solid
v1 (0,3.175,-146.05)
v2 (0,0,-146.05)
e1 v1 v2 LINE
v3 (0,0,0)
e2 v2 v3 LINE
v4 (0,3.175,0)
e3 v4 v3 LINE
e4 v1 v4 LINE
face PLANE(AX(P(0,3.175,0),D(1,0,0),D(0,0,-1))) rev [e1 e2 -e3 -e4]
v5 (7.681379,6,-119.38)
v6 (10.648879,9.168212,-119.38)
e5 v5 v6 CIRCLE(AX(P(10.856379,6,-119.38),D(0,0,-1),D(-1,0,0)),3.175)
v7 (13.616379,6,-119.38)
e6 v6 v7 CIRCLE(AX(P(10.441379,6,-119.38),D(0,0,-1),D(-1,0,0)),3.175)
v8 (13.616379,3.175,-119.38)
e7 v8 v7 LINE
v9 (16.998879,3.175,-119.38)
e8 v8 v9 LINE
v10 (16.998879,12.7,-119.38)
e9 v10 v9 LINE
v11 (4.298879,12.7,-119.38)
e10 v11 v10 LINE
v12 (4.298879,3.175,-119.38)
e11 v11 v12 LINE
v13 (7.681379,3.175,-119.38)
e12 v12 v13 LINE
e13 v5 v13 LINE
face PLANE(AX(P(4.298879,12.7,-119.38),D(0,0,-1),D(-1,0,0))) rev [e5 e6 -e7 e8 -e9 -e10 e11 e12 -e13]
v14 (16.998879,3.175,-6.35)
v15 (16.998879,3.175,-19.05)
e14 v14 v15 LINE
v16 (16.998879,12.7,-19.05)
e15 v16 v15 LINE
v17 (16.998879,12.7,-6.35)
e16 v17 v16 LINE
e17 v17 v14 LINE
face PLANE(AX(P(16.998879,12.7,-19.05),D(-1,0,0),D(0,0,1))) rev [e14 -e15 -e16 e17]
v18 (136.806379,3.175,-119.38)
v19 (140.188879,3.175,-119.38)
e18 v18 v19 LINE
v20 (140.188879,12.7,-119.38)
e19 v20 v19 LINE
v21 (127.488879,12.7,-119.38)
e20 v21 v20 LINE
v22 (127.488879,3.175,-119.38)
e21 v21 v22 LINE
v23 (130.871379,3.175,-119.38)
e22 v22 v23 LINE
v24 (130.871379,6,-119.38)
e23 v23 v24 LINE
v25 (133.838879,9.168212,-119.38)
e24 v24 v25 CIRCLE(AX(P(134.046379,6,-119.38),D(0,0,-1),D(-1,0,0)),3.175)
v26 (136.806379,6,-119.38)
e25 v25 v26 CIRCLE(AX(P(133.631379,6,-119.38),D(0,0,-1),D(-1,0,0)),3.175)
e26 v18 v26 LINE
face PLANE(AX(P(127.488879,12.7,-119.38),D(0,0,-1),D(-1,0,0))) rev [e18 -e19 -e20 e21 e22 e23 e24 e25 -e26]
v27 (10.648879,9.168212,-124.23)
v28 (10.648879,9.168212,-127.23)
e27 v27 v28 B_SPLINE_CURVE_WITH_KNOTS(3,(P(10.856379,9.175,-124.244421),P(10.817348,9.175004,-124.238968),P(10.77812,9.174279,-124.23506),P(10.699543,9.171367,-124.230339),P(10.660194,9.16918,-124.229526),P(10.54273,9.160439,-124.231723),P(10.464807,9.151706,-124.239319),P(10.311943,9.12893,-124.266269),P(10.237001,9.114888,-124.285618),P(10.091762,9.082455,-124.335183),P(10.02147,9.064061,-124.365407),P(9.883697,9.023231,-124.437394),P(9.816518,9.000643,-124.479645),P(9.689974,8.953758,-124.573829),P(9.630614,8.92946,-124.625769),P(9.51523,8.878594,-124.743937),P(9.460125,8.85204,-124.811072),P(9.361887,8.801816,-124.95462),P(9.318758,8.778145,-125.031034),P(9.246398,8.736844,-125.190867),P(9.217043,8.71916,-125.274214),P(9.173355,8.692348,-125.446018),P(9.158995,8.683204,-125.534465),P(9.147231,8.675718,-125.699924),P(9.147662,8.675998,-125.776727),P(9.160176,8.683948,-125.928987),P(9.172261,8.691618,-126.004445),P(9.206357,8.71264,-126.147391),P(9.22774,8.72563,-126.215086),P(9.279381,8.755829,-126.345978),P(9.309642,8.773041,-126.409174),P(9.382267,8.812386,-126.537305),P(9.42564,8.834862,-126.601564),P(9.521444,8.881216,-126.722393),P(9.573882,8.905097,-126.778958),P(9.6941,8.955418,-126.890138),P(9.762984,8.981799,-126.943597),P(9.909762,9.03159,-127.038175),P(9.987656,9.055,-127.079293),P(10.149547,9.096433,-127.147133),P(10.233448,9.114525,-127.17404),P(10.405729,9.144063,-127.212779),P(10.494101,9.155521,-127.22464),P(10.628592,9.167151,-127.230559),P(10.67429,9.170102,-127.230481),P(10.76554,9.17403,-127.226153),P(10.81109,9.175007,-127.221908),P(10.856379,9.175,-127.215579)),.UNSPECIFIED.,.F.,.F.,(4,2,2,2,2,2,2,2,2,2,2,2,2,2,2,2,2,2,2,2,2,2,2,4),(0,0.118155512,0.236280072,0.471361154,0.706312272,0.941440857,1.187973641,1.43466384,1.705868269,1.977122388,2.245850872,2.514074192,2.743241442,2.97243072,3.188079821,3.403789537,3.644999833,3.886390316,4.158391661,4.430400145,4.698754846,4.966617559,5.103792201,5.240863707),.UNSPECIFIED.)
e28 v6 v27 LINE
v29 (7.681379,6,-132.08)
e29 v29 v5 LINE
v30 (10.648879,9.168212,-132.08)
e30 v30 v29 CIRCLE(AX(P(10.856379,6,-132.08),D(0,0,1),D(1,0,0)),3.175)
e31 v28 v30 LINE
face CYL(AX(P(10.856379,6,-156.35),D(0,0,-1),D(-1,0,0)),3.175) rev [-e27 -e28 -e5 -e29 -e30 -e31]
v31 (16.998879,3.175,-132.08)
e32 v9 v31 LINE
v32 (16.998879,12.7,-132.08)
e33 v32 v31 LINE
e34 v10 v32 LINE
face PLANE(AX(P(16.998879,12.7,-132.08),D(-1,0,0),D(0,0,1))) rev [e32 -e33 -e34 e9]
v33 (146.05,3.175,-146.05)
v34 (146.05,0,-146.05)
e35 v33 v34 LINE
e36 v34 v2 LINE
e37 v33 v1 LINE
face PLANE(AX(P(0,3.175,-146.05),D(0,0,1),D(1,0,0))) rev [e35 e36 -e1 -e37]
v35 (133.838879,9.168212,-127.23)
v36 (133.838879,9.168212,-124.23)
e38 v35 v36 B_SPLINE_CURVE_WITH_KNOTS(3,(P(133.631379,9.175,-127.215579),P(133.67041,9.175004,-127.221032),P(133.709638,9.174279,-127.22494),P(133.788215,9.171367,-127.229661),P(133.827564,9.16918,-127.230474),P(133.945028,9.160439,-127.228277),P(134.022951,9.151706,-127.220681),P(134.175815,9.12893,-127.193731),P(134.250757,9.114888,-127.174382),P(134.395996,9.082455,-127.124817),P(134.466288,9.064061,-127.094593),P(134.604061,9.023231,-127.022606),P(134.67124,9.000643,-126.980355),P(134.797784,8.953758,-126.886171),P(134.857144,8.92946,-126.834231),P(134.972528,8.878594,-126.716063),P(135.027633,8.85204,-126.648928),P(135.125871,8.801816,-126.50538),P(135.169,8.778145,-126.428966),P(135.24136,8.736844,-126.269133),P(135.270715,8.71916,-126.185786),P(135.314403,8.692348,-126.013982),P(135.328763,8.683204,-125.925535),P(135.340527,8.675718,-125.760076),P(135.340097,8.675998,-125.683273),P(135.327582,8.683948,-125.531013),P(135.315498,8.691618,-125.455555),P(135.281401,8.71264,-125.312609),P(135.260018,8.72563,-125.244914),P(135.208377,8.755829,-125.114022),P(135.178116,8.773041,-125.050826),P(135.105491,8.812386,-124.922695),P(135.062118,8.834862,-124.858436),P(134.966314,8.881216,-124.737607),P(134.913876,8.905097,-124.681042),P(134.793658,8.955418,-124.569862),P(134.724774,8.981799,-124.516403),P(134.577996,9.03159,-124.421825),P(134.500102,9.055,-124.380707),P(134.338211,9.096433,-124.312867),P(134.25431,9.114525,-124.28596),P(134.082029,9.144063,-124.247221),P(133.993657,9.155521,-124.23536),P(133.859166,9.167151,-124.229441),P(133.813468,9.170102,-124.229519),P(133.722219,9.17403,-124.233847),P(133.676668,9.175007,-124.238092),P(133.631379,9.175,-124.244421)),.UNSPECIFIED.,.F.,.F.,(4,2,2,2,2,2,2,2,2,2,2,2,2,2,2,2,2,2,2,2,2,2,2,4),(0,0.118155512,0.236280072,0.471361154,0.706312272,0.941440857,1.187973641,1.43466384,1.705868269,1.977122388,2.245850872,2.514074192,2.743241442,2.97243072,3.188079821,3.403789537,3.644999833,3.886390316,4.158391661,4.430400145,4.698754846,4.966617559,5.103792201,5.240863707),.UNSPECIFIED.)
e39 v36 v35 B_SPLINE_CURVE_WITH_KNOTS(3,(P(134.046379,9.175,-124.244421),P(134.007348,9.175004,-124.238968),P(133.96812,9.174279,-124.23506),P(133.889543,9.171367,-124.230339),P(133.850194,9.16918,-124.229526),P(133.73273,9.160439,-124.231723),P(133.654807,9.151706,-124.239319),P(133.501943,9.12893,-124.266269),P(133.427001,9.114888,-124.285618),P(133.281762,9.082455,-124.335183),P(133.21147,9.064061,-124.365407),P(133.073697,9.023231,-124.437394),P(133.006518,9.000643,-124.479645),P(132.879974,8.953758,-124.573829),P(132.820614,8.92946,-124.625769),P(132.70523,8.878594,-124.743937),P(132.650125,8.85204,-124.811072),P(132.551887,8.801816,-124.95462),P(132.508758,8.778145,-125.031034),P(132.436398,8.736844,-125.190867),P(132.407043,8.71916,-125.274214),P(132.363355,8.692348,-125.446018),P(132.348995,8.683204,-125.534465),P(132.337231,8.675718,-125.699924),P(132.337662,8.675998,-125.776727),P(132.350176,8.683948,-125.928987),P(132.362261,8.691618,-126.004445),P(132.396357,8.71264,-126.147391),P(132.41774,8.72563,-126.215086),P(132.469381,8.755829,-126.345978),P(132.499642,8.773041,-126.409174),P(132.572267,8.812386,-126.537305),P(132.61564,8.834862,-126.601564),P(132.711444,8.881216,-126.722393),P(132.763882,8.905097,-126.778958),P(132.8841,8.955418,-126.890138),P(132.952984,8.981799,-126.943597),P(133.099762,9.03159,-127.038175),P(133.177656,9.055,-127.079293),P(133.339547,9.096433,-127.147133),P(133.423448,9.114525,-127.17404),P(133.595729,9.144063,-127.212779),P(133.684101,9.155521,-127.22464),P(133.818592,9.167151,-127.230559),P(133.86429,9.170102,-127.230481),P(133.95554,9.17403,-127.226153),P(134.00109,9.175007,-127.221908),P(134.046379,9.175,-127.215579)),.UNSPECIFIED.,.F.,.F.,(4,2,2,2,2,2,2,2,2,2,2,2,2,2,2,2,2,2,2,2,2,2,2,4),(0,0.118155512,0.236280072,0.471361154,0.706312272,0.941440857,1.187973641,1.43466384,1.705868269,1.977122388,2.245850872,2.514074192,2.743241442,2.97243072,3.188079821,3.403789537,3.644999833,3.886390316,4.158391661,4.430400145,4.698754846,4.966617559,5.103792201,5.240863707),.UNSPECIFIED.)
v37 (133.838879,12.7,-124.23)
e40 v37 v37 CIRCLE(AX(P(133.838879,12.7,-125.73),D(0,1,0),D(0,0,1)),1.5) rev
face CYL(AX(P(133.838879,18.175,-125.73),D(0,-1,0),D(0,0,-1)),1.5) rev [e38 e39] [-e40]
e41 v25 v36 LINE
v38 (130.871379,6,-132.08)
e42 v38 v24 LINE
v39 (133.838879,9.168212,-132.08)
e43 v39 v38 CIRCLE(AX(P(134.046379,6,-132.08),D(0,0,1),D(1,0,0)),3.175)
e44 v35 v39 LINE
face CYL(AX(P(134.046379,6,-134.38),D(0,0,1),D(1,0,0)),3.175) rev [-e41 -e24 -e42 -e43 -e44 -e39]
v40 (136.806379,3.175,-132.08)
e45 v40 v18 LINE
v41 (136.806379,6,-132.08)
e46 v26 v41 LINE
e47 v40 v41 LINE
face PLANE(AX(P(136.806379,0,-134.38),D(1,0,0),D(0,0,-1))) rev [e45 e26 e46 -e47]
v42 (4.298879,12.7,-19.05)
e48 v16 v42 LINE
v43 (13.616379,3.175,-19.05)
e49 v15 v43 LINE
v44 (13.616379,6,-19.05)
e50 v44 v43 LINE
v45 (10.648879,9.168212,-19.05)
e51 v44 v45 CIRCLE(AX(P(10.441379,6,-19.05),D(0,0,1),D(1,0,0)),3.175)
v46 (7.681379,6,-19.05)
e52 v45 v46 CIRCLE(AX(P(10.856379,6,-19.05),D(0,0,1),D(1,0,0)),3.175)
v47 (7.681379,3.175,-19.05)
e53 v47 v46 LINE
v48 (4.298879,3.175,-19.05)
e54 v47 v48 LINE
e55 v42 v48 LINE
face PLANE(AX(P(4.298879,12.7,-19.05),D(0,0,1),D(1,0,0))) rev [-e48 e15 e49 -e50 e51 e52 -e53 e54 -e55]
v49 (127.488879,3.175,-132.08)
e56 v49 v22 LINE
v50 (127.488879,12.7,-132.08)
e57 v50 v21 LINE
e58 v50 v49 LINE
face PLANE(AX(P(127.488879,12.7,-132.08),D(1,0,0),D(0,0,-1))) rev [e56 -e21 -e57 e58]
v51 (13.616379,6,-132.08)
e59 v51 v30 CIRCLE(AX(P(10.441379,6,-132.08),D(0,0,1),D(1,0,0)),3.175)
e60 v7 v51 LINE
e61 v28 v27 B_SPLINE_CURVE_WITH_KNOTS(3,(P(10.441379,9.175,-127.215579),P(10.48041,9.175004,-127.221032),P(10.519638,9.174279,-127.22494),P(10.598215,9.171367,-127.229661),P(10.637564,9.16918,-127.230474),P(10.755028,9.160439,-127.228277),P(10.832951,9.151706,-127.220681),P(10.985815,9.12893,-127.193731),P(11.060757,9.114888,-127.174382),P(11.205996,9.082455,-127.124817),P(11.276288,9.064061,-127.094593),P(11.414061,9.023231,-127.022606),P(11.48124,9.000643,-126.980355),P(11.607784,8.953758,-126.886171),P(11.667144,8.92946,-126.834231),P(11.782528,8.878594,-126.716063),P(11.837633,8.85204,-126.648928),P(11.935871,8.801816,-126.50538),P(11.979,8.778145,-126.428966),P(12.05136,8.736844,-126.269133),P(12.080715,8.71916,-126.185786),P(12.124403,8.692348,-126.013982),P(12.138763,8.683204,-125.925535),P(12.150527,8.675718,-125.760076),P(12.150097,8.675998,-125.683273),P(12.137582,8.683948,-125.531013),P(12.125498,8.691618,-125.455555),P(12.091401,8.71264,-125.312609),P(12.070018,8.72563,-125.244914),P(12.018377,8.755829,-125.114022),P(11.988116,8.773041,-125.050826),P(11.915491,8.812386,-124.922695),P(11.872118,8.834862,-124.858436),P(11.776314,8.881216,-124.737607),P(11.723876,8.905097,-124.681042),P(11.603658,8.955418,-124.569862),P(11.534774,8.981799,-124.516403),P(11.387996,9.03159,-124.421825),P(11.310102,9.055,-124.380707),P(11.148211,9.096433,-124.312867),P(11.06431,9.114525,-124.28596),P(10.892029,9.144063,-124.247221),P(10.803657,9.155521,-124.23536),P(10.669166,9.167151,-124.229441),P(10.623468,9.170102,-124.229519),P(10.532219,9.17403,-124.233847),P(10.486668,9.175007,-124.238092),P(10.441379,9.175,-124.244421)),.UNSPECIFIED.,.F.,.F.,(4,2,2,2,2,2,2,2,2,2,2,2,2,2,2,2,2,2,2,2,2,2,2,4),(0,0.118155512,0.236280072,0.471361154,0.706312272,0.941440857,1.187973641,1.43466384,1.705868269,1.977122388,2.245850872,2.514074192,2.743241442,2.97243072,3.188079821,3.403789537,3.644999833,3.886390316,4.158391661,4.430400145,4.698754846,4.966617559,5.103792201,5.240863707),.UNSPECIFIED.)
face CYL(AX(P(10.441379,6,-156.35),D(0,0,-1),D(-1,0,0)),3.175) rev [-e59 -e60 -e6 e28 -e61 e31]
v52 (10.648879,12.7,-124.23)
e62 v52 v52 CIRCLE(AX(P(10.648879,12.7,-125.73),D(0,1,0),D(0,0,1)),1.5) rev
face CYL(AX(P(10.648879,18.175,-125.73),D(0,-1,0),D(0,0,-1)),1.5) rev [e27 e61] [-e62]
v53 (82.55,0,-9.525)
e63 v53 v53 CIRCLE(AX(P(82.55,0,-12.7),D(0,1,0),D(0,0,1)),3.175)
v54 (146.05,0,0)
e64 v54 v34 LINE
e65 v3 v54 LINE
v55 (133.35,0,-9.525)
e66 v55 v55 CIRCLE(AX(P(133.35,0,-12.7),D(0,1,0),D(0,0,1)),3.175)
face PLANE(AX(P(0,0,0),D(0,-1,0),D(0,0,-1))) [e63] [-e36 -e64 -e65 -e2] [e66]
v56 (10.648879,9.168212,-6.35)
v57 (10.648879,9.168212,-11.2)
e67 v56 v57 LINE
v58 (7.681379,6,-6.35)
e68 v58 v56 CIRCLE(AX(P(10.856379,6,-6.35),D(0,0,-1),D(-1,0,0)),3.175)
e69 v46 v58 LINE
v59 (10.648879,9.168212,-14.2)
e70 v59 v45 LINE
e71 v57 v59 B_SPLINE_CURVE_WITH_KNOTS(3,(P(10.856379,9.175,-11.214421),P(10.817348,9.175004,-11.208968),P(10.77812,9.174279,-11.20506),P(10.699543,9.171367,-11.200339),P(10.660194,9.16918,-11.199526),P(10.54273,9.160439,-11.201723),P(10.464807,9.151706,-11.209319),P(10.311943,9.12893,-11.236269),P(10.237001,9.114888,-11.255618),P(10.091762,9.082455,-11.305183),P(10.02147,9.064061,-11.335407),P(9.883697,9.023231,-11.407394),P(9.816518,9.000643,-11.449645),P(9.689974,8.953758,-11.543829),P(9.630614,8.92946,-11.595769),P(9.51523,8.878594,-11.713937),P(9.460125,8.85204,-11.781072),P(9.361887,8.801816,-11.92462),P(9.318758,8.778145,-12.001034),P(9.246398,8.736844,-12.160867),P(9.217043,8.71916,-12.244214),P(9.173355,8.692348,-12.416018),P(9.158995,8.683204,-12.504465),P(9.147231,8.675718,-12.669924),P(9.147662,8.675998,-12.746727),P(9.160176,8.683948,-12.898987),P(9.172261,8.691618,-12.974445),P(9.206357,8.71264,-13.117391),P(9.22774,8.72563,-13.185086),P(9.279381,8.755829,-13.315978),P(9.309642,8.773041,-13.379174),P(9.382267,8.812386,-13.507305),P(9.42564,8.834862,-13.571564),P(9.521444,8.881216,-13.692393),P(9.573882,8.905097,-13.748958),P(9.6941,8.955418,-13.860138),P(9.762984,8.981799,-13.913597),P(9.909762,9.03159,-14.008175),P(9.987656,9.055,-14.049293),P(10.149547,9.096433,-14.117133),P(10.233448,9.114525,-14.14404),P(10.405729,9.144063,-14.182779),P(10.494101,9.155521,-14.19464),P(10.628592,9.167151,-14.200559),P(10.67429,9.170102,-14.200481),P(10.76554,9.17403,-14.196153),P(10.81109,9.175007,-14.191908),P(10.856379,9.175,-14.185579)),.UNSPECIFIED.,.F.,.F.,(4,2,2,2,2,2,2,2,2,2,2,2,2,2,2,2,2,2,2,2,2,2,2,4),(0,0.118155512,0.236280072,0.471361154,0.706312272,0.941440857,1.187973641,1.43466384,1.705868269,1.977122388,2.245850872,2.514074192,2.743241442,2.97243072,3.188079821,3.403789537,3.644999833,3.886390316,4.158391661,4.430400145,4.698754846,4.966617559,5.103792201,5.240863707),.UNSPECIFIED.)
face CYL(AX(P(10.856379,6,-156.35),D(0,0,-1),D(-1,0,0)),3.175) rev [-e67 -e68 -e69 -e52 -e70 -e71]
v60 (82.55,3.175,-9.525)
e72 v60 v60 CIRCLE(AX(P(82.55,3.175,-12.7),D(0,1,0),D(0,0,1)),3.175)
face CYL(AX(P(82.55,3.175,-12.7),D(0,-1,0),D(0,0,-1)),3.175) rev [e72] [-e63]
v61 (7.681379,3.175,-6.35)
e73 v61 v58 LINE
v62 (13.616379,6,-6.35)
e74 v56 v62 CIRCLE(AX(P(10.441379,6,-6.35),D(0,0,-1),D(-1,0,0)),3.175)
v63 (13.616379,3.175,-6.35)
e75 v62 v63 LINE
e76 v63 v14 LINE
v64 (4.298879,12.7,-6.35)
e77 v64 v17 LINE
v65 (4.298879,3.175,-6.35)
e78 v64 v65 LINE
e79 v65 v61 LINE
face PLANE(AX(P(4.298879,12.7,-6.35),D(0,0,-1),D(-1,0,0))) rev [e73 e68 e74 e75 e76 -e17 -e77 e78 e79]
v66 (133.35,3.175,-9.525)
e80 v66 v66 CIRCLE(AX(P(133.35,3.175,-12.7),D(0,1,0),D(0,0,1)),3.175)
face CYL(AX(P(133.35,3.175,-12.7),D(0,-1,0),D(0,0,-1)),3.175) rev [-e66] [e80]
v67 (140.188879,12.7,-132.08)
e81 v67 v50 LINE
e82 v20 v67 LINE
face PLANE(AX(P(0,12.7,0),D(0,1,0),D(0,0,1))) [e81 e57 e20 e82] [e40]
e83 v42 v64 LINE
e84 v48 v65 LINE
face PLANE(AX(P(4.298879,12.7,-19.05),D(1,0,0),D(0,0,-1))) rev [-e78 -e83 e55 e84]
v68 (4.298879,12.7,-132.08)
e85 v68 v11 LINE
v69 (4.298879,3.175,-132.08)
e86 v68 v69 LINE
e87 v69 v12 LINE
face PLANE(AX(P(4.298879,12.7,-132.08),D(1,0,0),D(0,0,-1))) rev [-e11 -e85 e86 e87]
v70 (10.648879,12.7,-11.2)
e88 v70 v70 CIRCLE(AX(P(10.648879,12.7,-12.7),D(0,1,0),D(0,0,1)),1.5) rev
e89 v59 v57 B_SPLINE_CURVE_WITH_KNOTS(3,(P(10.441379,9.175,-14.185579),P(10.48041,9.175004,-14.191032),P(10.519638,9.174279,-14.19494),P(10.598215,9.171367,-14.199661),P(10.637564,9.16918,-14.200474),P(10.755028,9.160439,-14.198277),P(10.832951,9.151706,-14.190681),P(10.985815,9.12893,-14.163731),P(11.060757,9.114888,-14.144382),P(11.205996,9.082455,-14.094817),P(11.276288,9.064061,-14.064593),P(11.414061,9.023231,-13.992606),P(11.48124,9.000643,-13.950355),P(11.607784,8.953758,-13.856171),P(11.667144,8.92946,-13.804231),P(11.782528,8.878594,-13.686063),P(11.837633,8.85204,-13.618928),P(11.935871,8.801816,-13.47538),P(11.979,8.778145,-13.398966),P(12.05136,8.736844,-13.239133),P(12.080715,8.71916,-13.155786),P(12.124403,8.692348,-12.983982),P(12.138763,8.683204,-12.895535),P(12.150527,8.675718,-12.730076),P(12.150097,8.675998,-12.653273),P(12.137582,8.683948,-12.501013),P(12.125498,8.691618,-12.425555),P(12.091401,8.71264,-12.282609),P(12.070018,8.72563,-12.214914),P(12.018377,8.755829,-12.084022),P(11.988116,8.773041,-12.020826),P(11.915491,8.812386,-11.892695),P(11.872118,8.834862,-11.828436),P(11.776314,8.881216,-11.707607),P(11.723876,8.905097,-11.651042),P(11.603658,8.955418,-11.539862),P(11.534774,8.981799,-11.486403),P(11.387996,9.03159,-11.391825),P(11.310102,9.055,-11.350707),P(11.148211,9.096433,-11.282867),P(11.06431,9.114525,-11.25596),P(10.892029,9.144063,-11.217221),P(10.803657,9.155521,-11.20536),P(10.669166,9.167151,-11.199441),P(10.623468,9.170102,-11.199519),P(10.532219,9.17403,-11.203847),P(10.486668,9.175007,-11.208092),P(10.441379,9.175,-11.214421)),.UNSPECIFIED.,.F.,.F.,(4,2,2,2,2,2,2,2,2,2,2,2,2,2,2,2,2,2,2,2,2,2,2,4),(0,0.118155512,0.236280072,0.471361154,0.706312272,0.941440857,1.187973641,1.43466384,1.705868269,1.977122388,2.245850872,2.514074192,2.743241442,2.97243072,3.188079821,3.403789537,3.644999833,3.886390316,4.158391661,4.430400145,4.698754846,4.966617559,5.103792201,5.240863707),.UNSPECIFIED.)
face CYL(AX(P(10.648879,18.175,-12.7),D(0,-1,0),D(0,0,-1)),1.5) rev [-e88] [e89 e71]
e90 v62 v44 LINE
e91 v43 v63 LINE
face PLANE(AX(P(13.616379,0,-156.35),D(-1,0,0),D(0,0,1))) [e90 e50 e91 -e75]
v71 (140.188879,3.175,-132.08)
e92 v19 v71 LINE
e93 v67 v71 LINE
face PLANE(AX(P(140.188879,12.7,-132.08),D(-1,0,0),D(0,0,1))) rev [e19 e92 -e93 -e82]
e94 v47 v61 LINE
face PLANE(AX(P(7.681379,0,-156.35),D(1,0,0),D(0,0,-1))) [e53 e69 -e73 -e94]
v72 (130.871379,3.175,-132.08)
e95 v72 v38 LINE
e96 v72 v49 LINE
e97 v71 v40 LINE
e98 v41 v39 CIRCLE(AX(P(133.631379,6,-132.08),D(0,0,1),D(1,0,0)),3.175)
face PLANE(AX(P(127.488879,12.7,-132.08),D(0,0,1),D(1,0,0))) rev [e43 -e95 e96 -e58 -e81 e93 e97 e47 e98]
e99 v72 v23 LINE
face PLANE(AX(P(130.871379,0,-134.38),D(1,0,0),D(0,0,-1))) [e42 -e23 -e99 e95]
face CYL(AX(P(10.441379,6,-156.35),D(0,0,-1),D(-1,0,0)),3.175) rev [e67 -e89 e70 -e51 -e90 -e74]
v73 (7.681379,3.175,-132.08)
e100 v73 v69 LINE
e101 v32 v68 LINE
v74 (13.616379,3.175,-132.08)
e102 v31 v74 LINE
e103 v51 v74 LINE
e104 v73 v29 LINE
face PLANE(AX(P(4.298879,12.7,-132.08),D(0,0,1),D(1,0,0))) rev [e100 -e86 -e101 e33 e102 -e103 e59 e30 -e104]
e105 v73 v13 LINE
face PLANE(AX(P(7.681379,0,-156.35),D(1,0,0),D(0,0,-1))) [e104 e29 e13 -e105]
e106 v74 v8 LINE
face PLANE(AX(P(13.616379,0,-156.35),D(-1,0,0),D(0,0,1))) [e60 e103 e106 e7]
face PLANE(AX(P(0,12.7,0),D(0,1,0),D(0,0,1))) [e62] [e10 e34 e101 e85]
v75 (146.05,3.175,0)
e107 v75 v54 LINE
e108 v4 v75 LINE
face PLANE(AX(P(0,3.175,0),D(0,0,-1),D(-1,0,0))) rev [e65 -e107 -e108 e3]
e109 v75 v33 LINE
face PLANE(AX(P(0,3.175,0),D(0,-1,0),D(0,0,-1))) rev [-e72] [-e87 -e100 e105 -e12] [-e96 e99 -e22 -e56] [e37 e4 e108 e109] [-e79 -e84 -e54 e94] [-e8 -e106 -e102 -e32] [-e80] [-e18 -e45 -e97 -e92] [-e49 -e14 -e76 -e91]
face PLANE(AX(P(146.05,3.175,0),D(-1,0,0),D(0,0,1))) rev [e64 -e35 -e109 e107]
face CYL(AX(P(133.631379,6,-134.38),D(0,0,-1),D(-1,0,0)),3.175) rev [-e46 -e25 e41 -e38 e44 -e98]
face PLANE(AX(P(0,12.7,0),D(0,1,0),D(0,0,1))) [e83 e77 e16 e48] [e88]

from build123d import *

# Parameters (mm, degrees)
SKETCH1_W           = 146.05
SKETCH1_H           = 146.05
SKETCH1_R           = 3.175
BOSS_EXTRUDE1_DEPTH = 3.175
SKETCH4_W           = 12.7
SKETCH4_H           = 12.7
BOSS_EXTRUDE4_DEPTH = 9.525
SKETCH6_W           = 5.935
SKETCH6_H           = 6
CUT_EXTRUDE2_DEPTH  = 150
SKETCH7_W           = 5.935
SKETCH7_H           = 6
CUT_EXTRUDE3_DEPTH  = 15
SKETCH2_R           = 1.5
CUT_EXTRUDE4_DEPTH  = 15
FILLET2_R           = 3.175


with BuildPart() as part:
    # Sketch1 → Boss-Extrude1 (new body)
    with BuildSketch(Plane(origin=(0, 0, 0), x_dir=(1, 0, 0), z_dir=(0, 1, 0))):
        with Locations((73.025, 73.025)):
            Rectangle(SKETCH1_W, SKETCH1_H)
        with Locations(Location((133.35, 12.7, 0), (0, 0, 270))):
            Circle(SKETCH1_R, mode=Mode.SUBTRACT)
        with Locations(Location((82.55, 12.7, 0), (0, 0, 270))):
            Circle(SKETCH1_R, mode=Mode.SUBTRACT)
    extrude(amount=BOSS_EXTRUDE1_DEPTH)

    # Sketch4 → Boss-Extrude4 (add)
    with BuildSketch(Plane(origin=(0, 3.175, 0), x_dir=(1, 0, 0), z_dir=(0, 1, 0))):
        with Locations((10.648879027, 12.7)):
            Rectangle(SKETCH4_W, SKETCH4_H)
        with Locations((10.648879027, 125.73)):
            Rectangle(SKETCH4_W, SKETCH4_H)
        with Locations((133.838879027, 125.73)):
            Rectangle(SKETCH4_W, SKETCH4_H)
    extrude(amount=BOSS_EXTRUDE4_DEPTH)

    # Sketch6 → Cut-Extrude2 (cut)
    with BuildSketch(Plane.XY.offset(-6.35)):
        with Locations((10.648879027, 6.175)):
            Rectangle(SKETCH6_W, SKETCH6_H)
    extrude(amount=-CUT_EXTRUDE2_DEPTH, mode=Mode.SUBTRACT)

    # Sketch7 → Cut-Extrude3 (cut)
    with BuildSketch(Plane.XY.offset(-119.38)):
        with Locations((133.838879027, 6.175)):
            Rectangle(SKETCH7_W, SKETCH7_H)
    extrude(amount=-CUT_EXTRUDE3_DEPTH, mode=Mode.SUBTRACT)

    # Sketch2 → Cut-Extrude4 (cut)
    with BuildSketch(Plane(origin=(0, 3.175, 0), x_dir=(1, 0, 0), z_dir=(0, 1, 0))):
        with Locations(Location((10.648879027, 125.73, 0), (0, 0, 90))):
            Circle(SKETCH2_R)
        with Locations(Location((133.838879027, 125.73, 0), (0, 0, 180))):
            Circle(SKETCH2_R)
        with Locations(Location((10.648879027, 12.7, 0), (0, 0, 90))):
            Circle(SKETCH2_R)
    extrude(amount=CUT_EXTRUDE4_DEPTH, mode=Mode.SUBTRACT)

    # Fillet2
    # the kernel refuses this fillet: 3.175 mm, written as the material it adds along each edge
    with BuildSketch(Plane(origin=(136.806379027, 9.175, -119.38), x_dir=(0, -1, 0), z_dir=(0, 0, -1))) as fillet2_piece_1_section:
        with BuildLine():
            CenterArc((FILLET2_R, FILLET2_R), FILLET2_R, 180, 90)
            Line((0, FILLET2_R), (0, 0))
            Line((0, 0), (FILLET2_R, 0))
        make_face()
    fillet2_piece_1 = extrude(amount=12.7, mode=Mode.PRIVATE)
    fillet2_piece_1 = fillet2_piece_1 - Plane(origin=(133.838879027, 8.440537645, -125.73), x_dir=(-1, 0, 0), z_dir=(0, -1, 0)) * Cylinder(1.5, 39, mode=Mode.PRIVATE)
    add(fillet2_piece_1)
    with BuildSketch(Plane(origin=(130.871379027, 9.175, -119.38), x_dir=(0, -1, 0), z_dir=(0, 0, -1))) as fillet2_piece_2_section:
        with BuildLine():
            CenterArc((FILLET2_R, -FILLET2_R), FILLET2_R, 90, 90)
            Line((0, -FILLET2_R), (0, 0))
            Line((0, 0), (FILLET2_R, 0))
        make_face()
    fillet2_piece_2 = extrude(amount=12.7, mode=Mode.PRIVATE)
    fillet2_piece_2 = fillet2_piece_2 - Plane(origin=(133.838879027, 8.44053751, -125.73), x_dir=(-1, 0, 0), z_dir=(0, -1, 0)) * Cylinder(1.5, 39, mode=Mode.PRIVATE)
    add(fillet2_piece_2)
    with BuildSketch(Plane(origin=(13.616379027, 9.175, -119.38), x_dir=(0, -1, 0), z_dir=(0, 0, -1))) as fillet2_piece_3_section:
        with BuildLine():
            CenterArc((FILLET2_R, FILLET2_R), FILLET2_R, 180, 90)
            Line((0, FILLET2_R), (0, 0))
            Line((0, 0), (FILLET2_R, 0))
        make_face()
    fillet2_piece_3 = extrude(amount=12.7, mode=Mode.PRIVATE)
    fillet2_piece_3 = fillet2_piece_3 - Plane(origin=(10.648879027, 8.440537543, -125.73), x_dir=(0, 0, -1), z_dir=(0, -1, 0)) * Cylinder(1.5, 39, mode=Mode.PRIVATE)
    add(fillet2_piece_3)
    with BuildSketch(Plane(origin=(7.681379027, 9.175, -119.38), x_dir=(0, -1, 0), z_dir=(0, 0, -1))) as fillet2_piece_4_section:
        with BuildLine():
            CenterArc((FILLET2_R, -FILLET2_R), FILLET2_R, 90, 90)
            Line((0, -FILLET2_R), (0, 0))
            Line((0, 0), (FILLET2_R, 0))
        make_face()
    fillet2_piece_4 = extrude(amount=12.7, mode=Mode.PRIVATE)
    fillet2_piece_4 = fillet2_piece_4 - Plane(origin=(10.648879027, 8.440537622, -125.73), x_dir=(0, 0, -1), z_dir=(0, -1, 0)) * Cylinder(1.5, 39, mode=Mode.PRIVATE)
    add(fillet2_piece_4)
    with BuildSketch(Plane(origin=(13.616379027, 9.175, -6.35), x_dir=(0, -1, 0), z_dir=(0, 0, -1))) as fillet2_piece_5_section:
        with BuildLine():
            CenterArc((FILLET2_R, FILLET2_R), FILLET2_R, 180, 90)
            Line((0, FILLET2_R), (0, 0))
            Line((0, 0), (FILLET2_R, 0))
        make_face()
    fillet2_piece_5 = extrude(amount=12.7, mode=Mode.PRIVATE)
    fillet2_piece_5 = fillet2_piece_5 - Plane(origin=(10.648879027, 8.440537543, -12.7), x_dir=(0, 0, -1), z_dir=(0, -1, 0)) * Cylinder(1.5, 39, mode=Mode.PRIVATE)
    add(fillet2_piece_5)
    with BuildSketch(Plane(origin=(7.681379027, 9.175, -6.35), x_dir=(0, -1, 0), z_dir=(0, 0, -1))) as fillet2_piece_6_section:
        with BuildLine():
            CenterArc((FILLET2_R, -FILLET2_R), FILLET2_R, 90, 90)
            Line((0, -FILLET2_R), (0, 0))
            Line((0, 0), (FILLET2_R, 0))
        make_face()
    fillet2_piece_6 = extrude(amount=12.7, mode=Mode.PRIVATE)
    fillet2_piece_6 = fillet2_piece_6 - Plane(origin=(10.648879027, 8.440537622, -12.7), x_dir=(0, 0, -1), z_dir=(0, -1, 0)) * Cylinder(1.5, 39, mode=Mode.PRIVATE)
    add(fillet2_piece_6)


solid = part.part
